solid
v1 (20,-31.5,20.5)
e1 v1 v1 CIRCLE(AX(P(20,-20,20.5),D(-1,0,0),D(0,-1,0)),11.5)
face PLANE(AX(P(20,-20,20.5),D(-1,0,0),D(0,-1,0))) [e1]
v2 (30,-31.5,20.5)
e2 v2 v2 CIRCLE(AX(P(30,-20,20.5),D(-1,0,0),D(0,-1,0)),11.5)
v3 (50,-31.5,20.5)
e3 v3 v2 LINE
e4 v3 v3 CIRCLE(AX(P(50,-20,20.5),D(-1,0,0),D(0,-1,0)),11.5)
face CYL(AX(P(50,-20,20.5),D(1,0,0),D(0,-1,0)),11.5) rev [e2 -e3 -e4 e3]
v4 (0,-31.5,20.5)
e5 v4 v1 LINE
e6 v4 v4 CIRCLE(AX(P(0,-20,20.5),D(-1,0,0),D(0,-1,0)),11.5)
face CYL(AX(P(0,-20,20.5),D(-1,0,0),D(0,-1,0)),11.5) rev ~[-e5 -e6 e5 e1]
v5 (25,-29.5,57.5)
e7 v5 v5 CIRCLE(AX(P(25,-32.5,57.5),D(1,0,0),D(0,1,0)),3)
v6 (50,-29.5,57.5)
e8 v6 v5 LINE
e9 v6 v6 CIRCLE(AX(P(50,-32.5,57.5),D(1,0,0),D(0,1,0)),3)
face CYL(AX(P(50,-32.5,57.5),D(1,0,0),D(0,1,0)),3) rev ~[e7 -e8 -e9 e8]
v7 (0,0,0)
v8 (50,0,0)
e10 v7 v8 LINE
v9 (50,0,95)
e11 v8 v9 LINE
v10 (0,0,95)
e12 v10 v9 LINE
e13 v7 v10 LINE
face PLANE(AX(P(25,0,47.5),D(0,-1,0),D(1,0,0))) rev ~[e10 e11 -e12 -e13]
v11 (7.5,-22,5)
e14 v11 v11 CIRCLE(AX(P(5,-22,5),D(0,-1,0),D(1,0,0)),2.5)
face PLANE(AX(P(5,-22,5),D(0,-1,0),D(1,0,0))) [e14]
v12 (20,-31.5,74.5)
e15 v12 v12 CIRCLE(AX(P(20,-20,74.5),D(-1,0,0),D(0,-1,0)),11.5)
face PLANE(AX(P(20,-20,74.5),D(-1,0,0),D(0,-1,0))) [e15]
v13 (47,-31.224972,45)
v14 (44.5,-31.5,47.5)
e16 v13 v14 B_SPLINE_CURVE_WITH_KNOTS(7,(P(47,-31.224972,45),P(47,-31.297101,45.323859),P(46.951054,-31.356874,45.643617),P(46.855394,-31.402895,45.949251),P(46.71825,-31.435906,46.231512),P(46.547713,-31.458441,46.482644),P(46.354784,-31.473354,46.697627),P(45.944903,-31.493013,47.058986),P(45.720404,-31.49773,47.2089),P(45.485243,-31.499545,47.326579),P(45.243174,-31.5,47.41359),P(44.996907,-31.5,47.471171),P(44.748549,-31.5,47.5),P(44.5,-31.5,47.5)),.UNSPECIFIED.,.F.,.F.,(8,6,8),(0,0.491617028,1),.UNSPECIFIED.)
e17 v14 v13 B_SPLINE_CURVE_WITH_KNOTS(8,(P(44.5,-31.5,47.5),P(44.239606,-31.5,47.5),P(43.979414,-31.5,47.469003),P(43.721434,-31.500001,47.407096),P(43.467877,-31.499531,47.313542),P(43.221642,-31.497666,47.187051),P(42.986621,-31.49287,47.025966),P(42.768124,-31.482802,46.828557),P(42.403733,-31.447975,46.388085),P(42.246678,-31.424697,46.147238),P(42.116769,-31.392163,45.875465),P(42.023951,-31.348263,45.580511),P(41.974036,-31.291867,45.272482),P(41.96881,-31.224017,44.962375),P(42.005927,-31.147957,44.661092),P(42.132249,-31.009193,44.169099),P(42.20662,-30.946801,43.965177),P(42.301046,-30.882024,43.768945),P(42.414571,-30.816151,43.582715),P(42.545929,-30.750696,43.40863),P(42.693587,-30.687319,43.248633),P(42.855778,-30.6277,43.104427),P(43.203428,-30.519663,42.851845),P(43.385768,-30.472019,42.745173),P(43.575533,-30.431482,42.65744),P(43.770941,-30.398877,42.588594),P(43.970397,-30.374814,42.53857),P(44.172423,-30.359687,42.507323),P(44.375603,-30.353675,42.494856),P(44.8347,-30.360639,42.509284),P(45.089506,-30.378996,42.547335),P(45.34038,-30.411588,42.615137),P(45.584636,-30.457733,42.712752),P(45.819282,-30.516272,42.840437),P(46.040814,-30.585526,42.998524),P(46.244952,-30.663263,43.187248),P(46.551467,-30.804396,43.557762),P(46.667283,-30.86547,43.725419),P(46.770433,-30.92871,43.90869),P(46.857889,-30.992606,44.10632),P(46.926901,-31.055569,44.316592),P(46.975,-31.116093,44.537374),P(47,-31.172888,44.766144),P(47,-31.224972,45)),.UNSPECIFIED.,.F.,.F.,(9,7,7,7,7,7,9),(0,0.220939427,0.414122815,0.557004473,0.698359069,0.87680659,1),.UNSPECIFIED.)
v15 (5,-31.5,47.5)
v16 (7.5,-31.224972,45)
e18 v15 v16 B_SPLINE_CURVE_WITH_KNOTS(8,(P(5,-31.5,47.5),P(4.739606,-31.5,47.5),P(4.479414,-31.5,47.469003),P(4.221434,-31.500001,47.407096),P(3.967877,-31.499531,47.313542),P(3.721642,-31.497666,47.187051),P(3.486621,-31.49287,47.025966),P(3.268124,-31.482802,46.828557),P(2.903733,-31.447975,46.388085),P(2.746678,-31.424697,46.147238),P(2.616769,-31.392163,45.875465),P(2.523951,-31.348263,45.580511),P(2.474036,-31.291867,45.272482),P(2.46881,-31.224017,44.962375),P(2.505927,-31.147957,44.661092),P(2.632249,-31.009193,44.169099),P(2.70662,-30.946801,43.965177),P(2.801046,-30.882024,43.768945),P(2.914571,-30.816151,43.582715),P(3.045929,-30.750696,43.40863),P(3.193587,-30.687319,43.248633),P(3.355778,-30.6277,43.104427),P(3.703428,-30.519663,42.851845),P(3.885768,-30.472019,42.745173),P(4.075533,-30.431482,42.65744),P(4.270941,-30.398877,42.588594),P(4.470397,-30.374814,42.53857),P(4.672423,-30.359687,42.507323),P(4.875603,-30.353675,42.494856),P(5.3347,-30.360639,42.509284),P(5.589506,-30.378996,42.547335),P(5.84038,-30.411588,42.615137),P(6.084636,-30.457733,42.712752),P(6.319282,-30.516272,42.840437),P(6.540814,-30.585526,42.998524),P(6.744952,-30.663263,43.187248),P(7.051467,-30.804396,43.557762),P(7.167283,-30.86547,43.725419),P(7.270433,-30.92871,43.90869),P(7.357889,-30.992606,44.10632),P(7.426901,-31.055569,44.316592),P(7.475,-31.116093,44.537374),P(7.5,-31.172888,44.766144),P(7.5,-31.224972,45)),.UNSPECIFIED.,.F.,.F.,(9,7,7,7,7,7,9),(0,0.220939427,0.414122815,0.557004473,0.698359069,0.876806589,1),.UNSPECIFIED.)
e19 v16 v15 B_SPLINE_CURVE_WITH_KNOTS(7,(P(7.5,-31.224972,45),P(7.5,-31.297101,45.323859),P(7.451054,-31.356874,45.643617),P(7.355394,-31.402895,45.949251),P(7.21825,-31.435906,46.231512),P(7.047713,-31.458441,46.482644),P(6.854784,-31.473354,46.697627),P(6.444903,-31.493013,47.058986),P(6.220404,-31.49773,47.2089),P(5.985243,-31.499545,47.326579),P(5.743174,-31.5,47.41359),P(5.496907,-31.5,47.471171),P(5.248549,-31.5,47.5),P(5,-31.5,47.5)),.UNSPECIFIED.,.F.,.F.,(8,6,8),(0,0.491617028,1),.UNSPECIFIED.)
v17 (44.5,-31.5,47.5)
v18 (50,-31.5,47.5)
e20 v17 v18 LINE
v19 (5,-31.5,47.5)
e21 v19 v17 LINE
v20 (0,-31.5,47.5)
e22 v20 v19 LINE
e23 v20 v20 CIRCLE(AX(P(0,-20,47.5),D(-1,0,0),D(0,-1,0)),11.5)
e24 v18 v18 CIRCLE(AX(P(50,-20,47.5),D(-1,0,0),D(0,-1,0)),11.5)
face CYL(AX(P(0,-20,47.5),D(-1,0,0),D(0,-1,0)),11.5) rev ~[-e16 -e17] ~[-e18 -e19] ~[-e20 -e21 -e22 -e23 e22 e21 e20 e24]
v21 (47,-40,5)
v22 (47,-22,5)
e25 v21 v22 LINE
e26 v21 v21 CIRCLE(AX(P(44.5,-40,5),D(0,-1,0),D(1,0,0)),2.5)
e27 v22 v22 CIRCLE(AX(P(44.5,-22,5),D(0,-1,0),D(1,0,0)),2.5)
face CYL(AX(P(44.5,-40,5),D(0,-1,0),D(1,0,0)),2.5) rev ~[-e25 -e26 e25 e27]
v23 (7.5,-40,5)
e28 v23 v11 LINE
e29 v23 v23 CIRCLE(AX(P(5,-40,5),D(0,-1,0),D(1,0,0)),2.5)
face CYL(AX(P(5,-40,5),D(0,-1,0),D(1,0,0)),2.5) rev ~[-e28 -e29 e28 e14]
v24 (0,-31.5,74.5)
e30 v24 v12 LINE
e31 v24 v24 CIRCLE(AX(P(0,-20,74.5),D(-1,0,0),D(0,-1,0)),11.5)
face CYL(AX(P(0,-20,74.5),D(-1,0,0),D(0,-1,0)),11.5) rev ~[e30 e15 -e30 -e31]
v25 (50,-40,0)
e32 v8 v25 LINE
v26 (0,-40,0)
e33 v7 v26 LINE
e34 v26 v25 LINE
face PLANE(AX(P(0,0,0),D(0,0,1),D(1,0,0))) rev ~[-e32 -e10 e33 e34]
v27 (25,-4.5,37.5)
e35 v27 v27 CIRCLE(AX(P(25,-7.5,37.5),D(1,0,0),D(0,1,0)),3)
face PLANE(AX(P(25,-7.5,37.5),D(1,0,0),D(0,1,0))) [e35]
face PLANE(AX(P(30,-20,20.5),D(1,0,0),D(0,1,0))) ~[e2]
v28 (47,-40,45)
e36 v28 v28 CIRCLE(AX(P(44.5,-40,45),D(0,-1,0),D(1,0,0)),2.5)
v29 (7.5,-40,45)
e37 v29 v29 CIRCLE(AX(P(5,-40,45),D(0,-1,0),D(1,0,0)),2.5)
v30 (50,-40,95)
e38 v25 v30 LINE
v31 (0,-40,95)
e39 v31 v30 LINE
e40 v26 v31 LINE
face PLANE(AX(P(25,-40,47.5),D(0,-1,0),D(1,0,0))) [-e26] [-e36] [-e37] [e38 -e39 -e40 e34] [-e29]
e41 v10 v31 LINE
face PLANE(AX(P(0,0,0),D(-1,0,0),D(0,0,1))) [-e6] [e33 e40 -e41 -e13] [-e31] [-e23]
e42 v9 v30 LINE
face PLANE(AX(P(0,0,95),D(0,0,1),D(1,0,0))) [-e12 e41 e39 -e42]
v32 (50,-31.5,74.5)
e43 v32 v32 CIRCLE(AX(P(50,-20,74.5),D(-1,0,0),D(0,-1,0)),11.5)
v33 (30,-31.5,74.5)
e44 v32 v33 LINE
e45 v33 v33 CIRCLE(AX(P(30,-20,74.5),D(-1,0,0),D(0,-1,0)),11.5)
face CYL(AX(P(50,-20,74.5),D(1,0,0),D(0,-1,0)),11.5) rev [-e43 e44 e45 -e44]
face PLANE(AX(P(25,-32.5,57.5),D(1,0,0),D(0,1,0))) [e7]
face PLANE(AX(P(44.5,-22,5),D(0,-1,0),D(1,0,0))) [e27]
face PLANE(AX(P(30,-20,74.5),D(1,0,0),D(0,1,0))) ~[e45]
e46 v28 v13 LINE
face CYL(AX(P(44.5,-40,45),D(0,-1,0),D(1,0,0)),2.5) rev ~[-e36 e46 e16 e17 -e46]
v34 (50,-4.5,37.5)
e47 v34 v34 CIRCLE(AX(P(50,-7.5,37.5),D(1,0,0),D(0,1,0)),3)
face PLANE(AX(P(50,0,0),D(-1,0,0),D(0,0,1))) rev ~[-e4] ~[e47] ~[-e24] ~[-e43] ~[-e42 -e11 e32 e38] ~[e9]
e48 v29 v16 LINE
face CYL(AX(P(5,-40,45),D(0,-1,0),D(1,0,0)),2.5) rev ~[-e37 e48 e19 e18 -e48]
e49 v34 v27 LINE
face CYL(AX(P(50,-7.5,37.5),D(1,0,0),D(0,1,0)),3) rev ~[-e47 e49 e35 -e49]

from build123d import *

# Parameters (mm, degrees)
F0_W      = 50
F0_H      = 95
F1_DEPTH  = 40
F2_R      = 2.5
F3_DEPTH  = 18
F4_R      = 11.5
F5_DEPTH  = 20
F7_R      = 11.5
F8_DEPTH  = 50.001
F9_R      = 3
F10_DEPTH = 25


# Not quite as in the source:
# - a pattern or mirror of a feature is missing from the dataset's text; its kind, count and spacing are read off the source's solid


with BuildPart() as f1:
    # F0 (on Front) → F1 (new body)
    with BuildSketch(Plane.XZ):
        with Locations((25, 47.5)):
            Rectangle(F0_W, F0_H)
    extrude(amount=F1_DEPTH)

    # F2 (on face) → F3 (cut)
    with BuildSketch(Plane.XZ.offset(40)):
        with Locations((5, 5)):
            Circle(F2_R)
        with Locations((44.5, 5)):
            Circle(F2_R)
        with Locations((5, 45)):
            Circle(F2_R)
        with Locations((44.5, 45)):
            Circle(F2_R)
    extrude(amount=-F3_DEPTH, mode=Mode.SUBTRACT)

    # F4 (on face) → F5 (cut)
    with BuildSketch(Plane(origin=(0, 0, 0), x_dir=(0, -1, 0), z_dir=(-1, 0, 0))):
        with Locations((20, 74.5)):
            Circle(F4_R)
        with Locations((20, 20.5)):
            Circle(F4_R)
    f5 = extrude(amount=-F5_DEPTH, mode=Mode.SUBTRACT)

    # F5_copies: F5 across plane
    add(f5.mirror(Plane(origin=(25, 0, 0), x_dir=(0, 0, 1), z_dir=(1, 0, 0))), mode=Mode.SUBTRACT)

    # F7 (on face) → F8 (cut, through all)
    with BuildSketch(Plane(origin=(0, 0, 0), x_dir=(0, -1, 0), z_dir=(-1, 0, 0))):
        with Locations((20, 47.5)):
            Circle(F7_R)
    extrude(amount=-F8_DEPTH, mode=Mode.SUBTRACT)

    # F9 (on face) → F10 (cut)
    with BuildSketch(Plane.YZ.offset(50)):
        with Locations((-32.5, 57.5)):
            Circle(F9_R)
        with Locations((-7.5, 37.5)):
            Circle(F9_R)
    extrude(amount=-F10_DEPTH, mode=Mode.SUBTRACT)


solid = f1.part
